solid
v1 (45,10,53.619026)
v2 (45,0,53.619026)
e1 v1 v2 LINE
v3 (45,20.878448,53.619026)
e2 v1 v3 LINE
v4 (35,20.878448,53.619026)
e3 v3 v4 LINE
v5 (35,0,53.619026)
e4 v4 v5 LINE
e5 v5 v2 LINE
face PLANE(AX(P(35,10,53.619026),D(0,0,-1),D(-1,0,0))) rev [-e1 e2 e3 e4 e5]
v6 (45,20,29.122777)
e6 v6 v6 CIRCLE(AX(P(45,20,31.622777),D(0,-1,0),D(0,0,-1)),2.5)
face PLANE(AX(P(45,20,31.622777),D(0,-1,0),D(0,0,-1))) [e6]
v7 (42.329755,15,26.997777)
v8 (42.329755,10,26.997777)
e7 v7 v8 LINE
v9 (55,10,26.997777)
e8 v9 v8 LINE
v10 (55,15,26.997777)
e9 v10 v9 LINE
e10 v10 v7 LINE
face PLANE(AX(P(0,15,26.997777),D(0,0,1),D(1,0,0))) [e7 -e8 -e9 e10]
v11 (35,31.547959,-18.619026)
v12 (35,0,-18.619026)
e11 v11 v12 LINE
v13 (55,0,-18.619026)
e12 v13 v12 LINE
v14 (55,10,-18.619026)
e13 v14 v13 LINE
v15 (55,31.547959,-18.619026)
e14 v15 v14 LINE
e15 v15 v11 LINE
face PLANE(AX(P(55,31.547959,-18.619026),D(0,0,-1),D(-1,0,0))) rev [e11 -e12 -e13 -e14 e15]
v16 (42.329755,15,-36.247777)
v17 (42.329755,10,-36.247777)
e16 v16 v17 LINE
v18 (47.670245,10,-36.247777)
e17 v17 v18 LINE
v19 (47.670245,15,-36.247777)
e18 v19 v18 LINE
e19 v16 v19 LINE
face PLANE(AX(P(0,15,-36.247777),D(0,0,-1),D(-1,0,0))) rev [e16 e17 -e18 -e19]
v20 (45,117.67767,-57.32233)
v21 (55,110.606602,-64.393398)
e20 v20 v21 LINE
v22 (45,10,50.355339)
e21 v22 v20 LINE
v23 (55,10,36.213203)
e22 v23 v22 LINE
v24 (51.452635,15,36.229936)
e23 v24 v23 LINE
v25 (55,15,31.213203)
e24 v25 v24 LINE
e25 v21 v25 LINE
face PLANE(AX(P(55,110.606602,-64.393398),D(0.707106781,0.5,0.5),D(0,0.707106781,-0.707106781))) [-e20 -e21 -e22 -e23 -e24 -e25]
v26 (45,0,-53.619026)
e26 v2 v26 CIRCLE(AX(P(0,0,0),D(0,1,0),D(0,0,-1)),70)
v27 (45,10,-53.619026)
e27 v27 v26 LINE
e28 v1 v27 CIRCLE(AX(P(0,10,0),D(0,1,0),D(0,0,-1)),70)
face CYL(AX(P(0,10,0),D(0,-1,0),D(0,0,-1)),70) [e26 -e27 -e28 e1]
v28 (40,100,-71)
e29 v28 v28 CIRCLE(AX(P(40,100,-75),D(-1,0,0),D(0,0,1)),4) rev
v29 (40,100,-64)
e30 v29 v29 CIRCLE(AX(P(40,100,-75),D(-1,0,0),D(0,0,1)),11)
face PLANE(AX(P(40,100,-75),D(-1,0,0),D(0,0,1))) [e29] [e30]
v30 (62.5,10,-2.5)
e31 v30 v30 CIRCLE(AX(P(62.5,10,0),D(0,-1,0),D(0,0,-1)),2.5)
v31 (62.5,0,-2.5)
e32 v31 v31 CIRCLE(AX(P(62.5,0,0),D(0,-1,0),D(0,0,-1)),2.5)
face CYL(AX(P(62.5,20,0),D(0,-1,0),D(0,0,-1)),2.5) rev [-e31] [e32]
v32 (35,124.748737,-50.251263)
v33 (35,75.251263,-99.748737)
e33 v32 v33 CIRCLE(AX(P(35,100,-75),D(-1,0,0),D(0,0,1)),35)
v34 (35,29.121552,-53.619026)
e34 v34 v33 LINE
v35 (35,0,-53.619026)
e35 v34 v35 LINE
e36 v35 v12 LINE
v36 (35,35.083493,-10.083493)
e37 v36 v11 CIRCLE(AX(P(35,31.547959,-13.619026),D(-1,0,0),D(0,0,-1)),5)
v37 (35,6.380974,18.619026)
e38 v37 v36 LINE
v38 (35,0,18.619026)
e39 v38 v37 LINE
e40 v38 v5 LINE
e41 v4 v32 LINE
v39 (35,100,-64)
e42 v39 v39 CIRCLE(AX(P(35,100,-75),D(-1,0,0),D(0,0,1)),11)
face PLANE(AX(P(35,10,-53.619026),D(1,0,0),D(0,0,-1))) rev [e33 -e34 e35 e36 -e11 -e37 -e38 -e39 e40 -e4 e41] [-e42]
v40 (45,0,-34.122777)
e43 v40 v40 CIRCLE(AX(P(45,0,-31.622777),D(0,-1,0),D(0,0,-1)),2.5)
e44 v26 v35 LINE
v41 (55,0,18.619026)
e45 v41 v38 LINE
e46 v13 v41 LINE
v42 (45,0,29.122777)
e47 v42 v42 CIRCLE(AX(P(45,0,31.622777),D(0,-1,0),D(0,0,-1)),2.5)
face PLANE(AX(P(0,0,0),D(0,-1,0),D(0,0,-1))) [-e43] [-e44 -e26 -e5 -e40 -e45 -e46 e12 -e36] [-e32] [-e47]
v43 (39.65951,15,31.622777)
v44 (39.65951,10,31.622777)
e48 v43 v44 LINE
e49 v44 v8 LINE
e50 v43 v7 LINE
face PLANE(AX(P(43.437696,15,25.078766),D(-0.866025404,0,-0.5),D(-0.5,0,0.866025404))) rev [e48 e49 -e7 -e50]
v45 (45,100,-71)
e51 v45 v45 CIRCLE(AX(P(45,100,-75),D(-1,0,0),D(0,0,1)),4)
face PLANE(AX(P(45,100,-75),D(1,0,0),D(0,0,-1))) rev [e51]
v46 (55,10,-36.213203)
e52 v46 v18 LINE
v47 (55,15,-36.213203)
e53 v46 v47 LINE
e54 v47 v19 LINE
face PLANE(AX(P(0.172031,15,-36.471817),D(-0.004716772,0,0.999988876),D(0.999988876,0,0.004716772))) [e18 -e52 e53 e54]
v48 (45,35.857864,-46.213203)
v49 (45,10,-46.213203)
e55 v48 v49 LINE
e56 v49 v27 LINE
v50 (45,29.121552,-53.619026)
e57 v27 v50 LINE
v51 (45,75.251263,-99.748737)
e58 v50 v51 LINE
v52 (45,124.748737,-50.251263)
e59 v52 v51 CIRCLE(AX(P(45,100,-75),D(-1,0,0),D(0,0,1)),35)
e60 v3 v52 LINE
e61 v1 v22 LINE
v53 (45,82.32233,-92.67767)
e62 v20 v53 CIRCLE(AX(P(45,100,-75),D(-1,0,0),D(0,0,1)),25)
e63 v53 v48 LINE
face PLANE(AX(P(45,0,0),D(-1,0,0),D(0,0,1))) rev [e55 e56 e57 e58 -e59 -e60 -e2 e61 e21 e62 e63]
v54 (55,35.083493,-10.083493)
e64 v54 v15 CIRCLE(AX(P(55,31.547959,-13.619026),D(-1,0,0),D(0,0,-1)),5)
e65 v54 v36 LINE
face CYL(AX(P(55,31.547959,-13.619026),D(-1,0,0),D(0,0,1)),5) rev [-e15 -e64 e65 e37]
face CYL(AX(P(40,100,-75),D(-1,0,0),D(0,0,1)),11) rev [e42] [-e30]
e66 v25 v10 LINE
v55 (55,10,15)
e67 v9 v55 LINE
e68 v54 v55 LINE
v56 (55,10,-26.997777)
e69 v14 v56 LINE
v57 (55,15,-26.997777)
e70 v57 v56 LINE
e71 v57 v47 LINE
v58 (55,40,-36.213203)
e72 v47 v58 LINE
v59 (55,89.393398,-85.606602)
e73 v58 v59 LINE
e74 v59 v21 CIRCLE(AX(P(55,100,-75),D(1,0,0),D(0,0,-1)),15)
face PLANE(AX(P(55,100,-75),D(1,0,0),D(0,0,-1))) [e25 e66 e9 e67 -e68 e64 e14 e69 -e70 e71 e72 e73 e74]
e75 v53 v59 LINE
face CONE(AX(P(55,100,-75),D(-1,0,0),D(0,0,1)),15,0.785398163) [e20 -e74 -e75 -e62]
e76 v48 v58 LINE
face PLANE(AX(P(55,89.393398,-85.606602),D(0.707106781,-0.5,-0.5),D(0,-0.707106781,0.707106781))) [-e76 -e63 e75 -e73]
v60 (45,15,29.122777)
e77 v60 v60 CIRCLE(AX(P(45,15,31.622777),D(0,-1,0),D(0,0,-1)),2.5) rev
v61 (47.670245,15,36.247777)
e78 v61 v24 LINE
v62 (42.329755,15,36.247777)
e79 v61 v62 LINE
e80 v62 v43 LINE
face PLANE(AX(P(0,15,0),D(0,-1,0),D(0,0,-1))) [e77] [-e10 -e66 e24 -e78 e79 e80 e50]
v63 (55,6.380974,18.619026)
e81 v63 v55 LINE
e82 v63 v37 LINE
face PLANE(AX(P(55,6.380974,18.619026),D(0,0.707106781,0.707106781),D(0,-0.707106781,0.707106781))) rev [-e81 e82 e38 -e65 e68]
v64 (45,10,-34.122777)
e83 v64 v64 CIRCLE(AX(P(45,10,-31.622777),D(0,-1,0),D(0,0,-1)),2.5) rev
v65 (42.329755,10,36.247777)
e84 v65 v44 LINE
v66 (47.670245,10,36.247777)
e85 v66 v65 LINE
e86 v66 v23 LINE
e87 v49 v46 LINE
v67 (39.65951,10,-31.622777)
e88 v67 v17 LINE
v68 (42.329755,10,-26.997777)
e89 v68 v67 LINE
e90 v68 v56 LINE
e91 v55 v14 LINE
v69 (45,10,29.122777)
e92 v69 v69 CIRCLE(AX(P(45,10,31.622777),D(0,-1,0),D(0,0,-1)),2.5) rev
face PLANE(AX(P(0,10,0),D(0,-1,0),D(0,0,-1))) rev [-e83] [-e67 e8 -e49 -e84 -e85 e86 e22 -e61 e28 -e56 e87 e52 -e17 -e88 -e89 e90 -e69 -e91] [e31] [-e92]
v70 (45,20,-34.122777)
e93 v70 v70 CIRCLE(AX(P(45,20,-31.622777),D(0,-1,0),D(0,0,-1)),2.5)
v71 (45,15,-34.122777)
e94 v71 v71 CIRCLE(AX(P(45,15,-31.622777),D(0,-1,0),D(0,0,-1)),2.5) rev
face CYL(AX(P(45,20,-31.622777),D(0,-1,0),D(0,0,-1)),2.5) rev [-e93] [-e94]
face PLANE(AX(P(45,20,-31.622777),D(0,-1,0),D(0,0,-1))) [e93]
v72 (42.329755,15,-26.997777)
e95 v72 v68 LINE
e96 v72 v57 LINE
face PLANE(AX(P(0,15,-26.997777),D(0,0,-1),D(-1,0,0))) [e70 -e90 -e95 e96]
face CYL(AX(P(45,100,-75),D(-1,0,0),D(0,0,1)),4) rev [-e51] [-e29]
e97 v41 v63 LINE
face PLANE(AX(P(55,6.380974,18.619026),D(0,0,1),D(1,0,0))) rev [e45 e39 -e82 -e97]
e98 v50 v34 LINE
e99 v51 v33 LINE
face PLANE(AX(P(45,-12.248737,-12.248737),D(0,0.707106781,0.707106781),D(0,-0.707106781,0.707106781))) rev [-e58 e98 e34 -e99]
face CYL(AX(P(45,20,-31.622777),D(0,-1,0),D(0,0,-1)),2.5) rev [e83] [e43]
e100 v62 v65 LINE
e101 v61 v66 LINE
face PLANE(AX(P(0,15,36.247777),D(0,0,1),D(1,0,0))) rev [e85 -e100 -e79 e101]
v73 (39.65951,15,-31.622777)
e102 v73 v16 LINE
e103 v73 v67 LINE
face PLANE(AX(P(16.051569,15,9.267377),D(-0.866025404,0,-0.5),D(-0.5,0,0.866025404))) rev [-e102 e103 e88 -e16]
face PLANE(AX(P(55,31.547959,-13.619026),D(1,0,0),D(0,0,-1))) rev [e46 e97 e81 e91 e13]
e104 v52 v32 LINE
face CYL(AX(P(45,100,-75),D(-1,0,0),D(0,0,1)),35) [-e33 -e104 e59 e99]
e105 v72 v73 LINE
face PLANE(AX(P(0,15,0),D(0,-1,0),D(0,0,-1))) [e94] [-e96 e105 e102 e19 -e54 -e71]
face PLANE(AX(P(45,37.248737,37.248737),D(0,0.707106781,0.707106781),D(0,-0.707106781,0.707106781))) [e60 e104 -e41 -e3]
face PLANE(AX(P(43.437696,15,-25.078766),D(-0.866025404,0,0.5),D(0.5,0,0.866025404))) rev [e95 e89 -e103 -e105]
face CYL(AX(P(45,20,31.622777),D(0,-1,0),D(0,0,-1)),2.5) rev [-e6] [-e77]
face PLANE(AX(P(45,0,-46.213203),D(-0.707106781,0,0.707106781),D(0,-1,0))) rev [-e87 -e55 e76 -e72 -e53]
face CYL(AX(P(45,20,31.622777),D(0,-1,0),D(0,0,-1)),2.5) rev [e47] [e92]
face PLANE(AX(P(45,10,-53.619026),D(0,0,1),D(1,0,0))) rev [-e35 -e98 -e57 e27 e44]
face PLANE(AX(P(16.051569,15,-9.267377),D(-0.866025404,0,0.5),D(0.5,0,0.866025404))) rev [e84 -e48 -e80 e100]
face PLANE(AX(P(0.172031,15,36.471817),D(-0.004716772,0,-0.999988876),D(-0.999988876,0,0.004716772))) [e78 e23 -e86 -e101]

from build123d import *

# Parameters (mm, degrees)
BOSS_EXTRUDE3_DEPTH = 10
SKETCH4_R           = 35
SKETCH4_R_2         = 4
BOSS_EXTRUDE4_DEPTH = 10
BOSS_EXTRUDE6_DEPTH = 10
CHAMFER2_SIZE       = 30
CHAMFER2_SIZE2      = 42.426406871
CHAMFER3_SIZE       = 10
CUT_EXTRUDE1_DEPTH  = 20
SKETCH8_R           = 2.5
CUT_EXTRUDE2_DEPTH  = 20
CUT_EXTRUDE4_START  = -10
SKETCH9_R           = 2.5
CUT_EXTRUDE4_DEPTH  = 5
SKETCH10_R          = 11
CUT_EXTRUDE5_DEPTH  = 5


with BuildPart() as part:
    # Sketch3 → Boss-Extrude3 (new body)
    with BuildSketch(Plane(origin=(0, 0, 0), x_dir=(1, 0, 0), z_dir=(0, 1, 0))):
        with BuildLine():
            Line((45, 53.619026474), (35, 53.619026474))
            Line((35, 53.619026474), (35, -53.619026474))
            Line((35, -53.619026474), (45, -53.619026474))
            ThreePointArc((45, -53.619026474), (70, 0), (45, 53.619026474))
        make_face()
    extrude(amount=BOSS_EXTRUDE3_DEPTH)

    # Sketch4 → Boss-Extrude4 (add)
    # profile 1 of 2: a face of its own
    with BuildSketch(Plane.ZY.offset(-35)):
        with BuildLine():
            Line((-53.619026474, 29.121551791), (-53.619026474, 10))
            Line((-53.619026474, 10), (53.619026474, 10))
            Line((53.619026474, 10), (53.619026474, 20.878448209))
            Line((53.619026474, 20.878448209), (-50.251262658, 124.748737342))
            ThreePointArc((-50.251262658, 124.748737342), (-42.664216362, 113.393920133), (-40, 100))
            ThreePointArc((-40, 100), (-61.606079867, 67.664216362), (-99.748737342, 75.251262658))
            Line((-99.748737342, 75.251262658), (-53.619026474, 29.121551791))
        make_face()
    # profile 2 of 2: a face of its own
    with BuildSketch(Plane.ZY.offset(-35)):
        with Locations((-75, 100)):
            Circle(SKETCH4_R)
        with Locations((-75, 100)):
            Circle(SKETCH4_R_2, mode=Mode.SUBTRACT)
    extrude(amount=-BOSS_EXTRUDE4_DEPTH)

    # Sketch6 → Boss-Extrude6 (add)
    with BuildSketch(Plane(origin=(45, 0, 0), x_dir=(0, 0, -1), z_dir=(1, 0, 0))):
        with BuildLine():
            Line((64.393398282, 110.606601718), (-36.213203436, 10))
            Line((-36.213203436, 10), (6.213203436, 10))
            Line((6.213203436, 10), (85.606601718, 89.393398282))
            ThreePointArc((85.606601718, 89.393398282), (85.606601718, 110.606601718), (64.393398282, 110.606601718))
        make_face()
    extrude(amount=BOSS_EXTRUDE6_DEPTH)

    # Chamfer2
    chamfer2_edges = [part.edges().sort_by_distance(p)[0] for p in [
        (50, 10, -6.213203436),
    ]]
    chamfer2_side = [part.faces().sort_by_distance(p)[0] for p in [
        (56.695914019, 10, -4.424051509),
    ]]
    chamfer(chamfer2_edges, length=CHAMFER2_SIZE, length2=CHAMFER2_SIZE2, reference=chamfer2_side[0])

    # Chamfer3
    chamfer3_edges = [part.edges().sort_by_distance(p)[0] for p in [
        (45, 25, -36.213203436),
        (45, 64.696699141, -60.909902577),
        (45, 110.606601718, -85.606601718),
        (45, 60.303300859, -14.090097423),
    ]]
    chamfer(chamfer3_edges, length=CHAMFER3_SIZE - 0.0001)  # a hair under: the kernel refuses the full size

    # Sketch7 → Cut-Extrude1 (cut)
    with BuildSketch(Plane.ZY.offset(-35)):
        with BuildLine():
            Line((18.619026474, 6.380973526), (18.619026474, 0))
            Line((18.619026474, 0), (-18.619026474, 0))
            Line((-18.619026474, 0), (-18.619026474, 31.547958662))
            ThreePointArc((-18.619026474, 31.547958662), (-15.532443636, 36.167356325), (-10.083492568, 35.083492568))
            Line((-10.083492568, 35.083492568), (18.619026474, 6.380973526))
        make_face()
    extrude(amount=-CUT_EXTRUDE1_DEPTH, mode=Mode.SUBTRACT)

    # Sketch8 → Cut-Extrude2 (cut)
    with BuildSketch(Plane.XZ):
        with Locations(Location((45, 31.622776602, 0), (0, 0, 270))):
            Circle(SKETCH8_R)
        with Locations(Location((45, -31.622776602, 0), (0, 0, 270))):
            Circle(SKETCH8_R)
        with Locations(Location((62.5, 0, 0), (0, 0, 270))):
            Circle(SKETCH8_R)
    extrude(amount=-CUT_EXTRUDE2_DEPTH, mode=Mode.SUBTRACT)

    # Sketch9 → Cut-Extrude4 (cut)
    # profile 1 of 4: a face of its own
    with BuildSketch(Plane.XZ.offset(CUT_EXTRUDE4_START)):
        Polygon((55, 26.997776602), (47.670244995, 26.997776602), (50.34048999, 31.622776602), (47.670244995, 36.247776602), (55, 36.213203436), align=None)
    # profile 2 of 4: a face of its own
    with BuildSketch(Plane.XZ.offset(CUT_EXTRUDE4_START)):
        Polygon((42.329755005, 26.997776602), (47.670244995, 26.997776602), (50.34048999, 31.622776602), (47.670244995, 36.247776602), (42.329755005, 36.247776602), (39.65951001, 31.622776602), align=None)
        with Locations(Location((45, 31.622776602, 0), (0, 0, 270))):
            Circle(SKETCH9_R, mode=Mode.SUBTRACT)
    # profile 3 of 4: a face of its own
    with BuildSketch(Plane.XZ.offset(CUT_EXTRUDE4_START)):
        Polygon((55, -36.213203436), (47.670244995, -36.247776602), (50.34048999, -31.622776602), (47.670244995, -26.997776602), (55, -26.997776602), align=None)
    # profile 4 of 4: a face of its own
    with BuildSketch(Plane.XZ.offset(CUT_EXTRUDE4_START)):
        Polygon((42.329755005, -36.247776602), (47.670244995, -36.247776602), (50.34048999, -31.622776602), (47.670244995, -26.997776602), (42.329755005, -26.997776602), (39.65951001, -31.622776602), align=None)
        with Locations(Location((45, -31.622776602, 0), (0, 0, 270))):
            Circle(SKETCH9_R, mode=Mode.SUBTRACT)
    extrude(amount=-CUT_EXTRUDE4_DEPTH, mode=Mode.SUBTRACT)

    # Sketch10 → Cut-Extrude5 (cut)
    with BuildSketch(Plane.ZY.offset(-35)):
        with Locations((-75, 100)):
            Circle(SKETCH10_R)
    extrude(amount=-CUT_EXTRUDE5_DEPTH, mode=Mode.SUBTRACT)


solid = part.part
